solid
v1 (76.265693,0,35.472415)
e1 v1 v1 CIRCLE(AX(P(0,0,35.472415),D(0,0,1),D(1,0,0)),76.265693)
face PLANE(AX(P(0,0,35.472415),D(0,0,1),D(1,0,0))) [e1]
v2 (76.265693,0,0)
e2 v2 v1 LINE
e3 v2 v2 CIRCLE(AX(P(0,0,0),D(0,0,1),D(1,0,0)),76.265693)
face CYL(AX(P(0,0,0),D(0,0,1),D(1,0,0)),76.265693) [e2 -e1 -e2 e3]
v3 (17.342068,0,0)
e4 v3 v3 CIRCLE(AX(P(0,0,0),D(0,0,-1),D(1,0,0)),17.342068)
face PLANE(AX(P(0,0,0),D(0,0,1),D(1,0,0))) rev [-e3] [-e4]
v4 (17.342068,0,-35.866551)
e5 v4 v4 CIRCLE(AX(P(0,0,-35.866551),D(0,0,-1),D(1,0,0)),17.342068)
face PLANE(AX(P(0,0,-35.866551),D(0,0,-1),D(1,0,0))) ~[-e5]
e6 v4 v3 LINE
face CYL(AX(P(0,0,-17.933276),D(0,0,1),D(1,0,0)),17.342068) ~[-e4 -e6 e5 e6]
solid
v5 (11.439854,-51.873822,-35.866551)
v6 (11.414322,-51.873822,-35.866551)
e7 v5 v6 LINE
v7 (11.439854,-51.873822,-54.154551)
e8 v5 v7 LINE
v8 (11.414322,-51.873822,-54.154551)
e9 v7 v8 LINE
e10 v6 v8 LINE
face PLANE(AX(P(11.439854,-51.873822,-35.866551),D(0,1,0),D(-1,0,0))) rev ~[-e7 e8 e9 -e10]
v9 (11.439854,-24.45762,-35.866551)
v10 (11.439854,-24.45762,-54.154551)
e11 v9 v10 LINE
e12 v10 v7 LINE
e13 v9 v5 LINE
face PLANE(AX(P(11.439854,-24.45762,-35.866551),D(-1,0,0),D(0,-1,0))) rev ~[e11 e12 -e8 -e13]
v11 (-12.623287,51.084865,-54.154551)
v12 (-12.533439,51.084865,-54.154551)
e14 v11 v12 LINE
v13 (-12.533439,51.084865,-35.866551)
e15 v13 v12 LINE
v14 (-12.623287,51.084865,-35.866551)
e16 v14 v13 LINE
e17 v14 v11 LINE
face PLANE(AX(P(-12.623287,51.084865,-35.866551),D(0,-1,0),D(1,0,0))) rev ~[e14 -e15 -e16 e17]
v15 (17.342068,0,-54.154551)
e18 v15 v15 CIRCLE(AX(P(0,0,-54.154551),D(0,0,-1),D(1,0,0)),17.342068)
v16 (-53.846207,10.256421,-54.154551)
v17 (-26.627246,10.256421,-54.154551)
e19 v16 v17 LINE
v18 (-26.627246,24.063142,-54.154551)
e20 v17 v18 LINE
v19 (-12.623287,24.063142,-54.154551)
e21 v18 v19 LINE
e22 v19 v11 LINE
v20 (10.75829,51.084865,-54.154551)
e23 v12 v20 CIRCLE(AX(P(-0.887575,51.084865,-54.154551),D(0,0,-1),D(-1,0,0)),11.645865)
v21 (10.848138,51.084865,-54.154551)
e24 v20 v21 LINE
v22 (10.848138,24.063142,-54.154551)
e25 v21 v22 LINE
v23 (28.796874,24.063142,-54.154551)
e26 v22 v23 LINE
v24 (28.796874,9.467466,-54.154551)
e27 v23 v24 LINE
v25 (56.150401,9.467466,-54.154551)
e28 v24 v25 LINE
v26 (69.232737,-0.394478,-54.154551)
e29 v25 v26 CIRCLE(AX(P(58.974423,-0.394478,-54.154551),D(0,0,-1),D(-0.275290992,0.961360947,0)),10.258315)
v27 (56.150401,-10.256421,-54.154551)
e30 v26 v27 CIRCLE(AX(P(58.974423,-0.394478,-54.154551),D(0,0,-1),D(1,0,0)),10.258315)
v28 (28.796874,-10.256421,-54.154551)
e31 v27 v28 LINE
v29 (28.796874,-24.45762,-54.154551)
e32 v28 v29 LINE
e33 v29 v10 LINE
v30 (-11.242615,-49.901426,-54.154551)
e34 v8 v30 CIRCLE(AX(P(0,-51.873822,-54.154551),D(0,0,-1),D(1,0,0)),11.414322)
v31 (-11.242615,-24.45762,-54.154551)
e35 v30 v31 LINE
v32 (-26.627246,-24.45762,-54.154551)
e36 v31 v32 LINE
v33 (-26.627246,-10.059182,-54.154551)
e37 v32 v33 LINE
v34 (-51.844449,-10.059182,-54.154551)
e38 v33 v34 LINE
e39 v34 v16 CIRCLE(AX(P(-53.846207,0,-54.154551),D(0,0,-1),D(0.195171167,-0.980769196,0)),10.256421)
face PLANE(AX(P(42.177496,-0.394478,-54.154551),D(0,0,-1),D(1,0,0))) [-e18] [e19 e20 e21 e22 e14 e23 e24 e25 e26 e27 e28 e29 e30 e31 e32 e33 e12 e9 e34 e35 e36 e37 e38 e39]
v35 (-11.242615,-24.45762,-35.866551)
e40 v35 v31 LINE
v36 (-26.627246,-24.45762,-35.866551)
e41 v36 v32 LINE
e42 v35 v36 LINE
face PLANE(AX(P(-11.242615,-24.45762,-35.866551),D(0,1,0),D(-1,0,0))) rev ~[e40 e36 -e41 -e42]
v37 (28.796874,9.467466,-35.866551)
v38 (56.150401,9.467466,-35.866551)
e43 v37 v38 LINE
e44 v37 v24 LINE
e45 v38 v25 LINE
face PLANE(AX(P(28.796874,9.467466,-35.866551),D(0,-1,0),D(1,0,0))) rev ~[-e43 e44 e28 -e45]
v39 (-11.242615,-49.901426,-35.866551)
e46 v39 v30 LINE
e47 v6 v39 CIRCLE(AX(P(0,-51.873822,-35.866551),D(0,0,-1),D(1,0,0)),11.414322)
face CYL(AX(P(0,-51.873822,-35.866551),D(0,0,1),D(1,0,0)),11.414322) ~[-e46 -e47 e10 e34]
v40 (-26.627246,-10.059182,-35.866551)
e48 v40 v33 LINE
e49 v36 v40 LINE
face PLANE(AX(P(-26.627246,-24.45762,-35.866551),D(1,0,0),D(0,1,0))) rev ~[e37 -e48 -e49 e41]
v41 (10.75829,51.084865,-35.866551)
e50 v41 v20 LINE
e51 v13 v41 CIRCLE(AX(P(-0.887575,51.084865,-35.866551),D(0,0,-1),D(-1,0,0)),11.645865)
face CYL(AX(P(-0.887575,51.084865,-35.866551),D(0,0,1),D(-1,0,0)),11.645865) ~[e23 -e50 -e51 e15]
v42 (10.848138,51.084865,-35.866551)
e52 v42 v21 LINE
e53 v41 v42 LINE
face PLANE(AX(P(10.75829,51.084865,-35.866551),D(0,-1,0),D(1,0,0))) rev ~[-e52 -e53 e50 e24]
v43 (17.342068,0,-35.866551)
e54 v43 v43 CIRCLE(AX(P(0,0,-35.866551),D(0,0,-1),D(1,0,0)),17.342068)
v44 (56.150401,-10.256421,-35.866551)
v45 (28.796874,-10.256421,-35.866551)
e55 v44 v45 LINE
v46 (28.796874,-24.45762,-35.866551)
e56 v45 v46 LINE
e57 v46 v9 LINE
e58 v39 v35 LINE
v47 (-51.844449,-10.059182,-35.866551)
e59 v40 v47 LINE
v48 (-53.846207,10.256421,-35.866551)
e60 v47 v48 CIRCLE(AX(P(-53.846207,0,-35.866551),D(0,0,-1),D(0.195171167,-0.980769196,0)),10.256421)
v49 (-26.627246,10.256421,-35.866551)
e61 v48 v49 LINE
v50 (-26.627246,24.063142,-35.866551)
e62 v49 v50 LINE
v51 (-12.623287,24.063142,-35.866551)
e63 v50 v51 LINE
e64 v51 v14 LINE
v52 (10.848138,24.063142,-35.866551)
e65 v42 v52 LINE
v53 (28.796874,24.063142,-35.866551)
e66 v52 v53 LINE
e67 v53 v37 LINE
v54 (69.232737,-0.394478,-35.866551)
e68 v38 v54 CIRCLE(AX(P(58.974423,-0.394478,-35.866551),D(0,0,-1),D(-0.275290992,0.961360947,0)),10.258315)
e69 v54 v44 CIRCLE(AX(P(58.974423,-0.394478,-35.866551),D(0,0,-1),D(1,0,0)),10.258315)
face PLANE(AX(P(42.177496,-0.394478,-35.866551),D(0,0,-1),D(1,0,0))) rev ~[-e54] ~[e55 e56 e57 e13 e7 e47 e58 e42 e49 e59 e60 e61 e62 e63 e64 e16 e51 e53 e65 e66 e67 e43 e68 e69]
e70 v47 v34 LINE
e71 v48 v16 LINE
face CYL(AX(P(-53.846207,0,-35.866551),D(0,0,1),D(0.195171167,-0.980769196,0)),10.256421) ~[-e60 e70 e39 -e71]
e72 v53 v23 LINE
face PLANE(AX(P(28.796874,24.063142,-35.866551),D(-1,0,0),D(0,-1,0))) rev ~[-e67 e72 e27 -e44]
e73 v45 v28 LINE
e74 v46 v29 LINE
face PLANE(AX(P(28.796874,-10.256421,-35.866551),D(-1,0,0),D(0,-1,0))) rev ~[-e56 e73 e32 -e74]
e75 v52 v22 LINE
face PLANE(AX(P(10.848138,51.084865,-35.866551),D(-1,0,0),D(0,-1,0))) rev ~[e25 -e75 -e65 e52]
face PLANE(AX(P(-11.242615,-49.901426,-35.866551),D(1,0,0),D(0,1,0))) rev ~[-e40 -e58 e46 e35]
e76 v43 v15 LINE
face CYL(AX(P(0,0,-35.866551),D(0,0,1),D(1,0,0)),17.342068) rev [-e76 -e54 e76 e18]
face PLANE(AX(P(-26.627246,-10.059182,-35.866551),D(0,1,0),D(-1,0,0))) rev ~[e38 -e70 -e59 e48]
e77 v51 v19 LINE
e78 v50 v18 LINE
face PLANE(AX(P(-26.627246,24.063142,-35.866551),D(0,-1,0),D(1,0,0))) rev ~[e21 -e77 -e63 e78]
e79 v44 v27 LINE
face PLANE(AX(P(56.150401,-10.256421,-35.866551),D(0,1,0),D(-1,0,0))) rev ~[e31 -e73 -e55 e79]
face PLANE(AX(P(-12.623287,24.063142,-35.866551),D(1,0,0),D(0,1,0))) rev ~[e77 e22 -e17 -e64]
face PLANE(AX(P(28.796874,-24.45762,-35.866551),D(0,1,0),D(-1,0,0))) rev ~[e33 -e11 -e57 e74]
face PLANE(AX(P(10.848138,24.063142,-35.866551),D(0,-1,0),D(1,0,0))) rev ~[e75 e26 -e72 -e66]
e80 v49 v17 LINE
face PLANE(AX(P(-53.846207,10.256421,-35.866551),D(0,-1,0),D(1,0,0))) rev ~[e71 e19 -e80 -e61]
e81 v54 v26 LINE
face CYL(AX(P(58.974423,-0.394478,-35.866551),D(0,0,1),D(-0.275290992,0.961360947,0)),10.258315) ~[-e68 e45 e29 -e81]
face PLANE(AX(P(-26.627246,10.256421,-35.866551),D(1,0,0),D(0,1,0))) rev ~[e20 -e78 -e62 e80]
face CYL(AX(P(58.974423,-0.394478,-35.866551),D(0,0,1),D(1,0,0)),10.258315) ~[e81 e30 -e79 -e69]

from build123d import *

# Parameters (mm, degrees)
F2_W     = 17.3420682549
F2_H     = 35.8665511012
F4_R     = 17.3420682549
F5_DEPTH = 18.288


# Not quite as in the source:
# - the program builds the solid bodies; features that only make, move or delete a surface that nothing else refers to are left out


with BuildPart() as f1:
    # F0 (on Front) → F1 (revolve)
    with BuildSketch(Plane.XZ):
        with BuildLine():
            Line((0, 0), (35.2114337626, 0))
            ThreePointArc((35.2114337626, 0), (24.8982435888, 24.8982435888), (0, 35.2114337626))
            Line((0, 35.2114337626), (0, 0))
        make_face()
        with BuildLine():
            ThreePointArc((0, 35.2114337626), (24.8982435888, 24.8982435888), (35.2114337626, 0))
            Line((35.2114337626, 0), (76.2656927109, 0))
            Line((76.2656927109, 0), (76.2656927109, 35.4724153876))
            Line((76.2656927109, 35.4724153876), (0, 35.4724153876))
            Line((0, 35.4724153876), (0, 35.2114337626))
        make_face()
    revolve(axis=Axis((0, 0, 17.7362076938), (0, 0, 1)))

    # F2 (on Front) → F3 (revolve)
    with BuildSketch(Plane.XZ):
        with Locations((8.6710341275, -17.9332755506)):
            Rectangle(F2_W, F2_H)
    revolve(axis=Axis((0, 0, -17.9332755506), (0, 0, -1)))


with BuildPart() as f5:
    # F4 (on face) → F5 (new body)
    with BuildSketch(Plane(origin=(0, 0, -35.8665511012), x_dir=(1, 0, 0), z_dir=(0, 0, -1))):
        with BuildLine():
            Line((56.1504008339, 10.256420821), (28.7968739867, 10.256420821))
            Line((28.7968739867, 10.256420821), (28.7968739867, -9.467465803))
            Line((28.7968739867, -9.467465803), (56.1504008339, -9.467465803))
            ThreePointArc((56.1504008339, -9.467465803), (48.7161076265, 0.394477509), (56.1504008339, 10.256420821))
        make_face()
        Polygon((28.7968739867, 10.256420821), (28.7968739867, 24.4576204568), (11.4398542792, 24.4576204568), (-11.242615059, 24.4576204568), (-26.6272462904, 24.4576204568), (-26.6272462904, 10.0591816008), (-26.6272462904, -10.256420821), (-26.6272462904, -24.0631420165), (-12.623286806, -24.0631420165), (10.8481375501, -24.0631420165), (28.7968739867, -24.0631420165), (28.7968739867, -9.467465803), align=None)
        Circle(F4_R, mode=Mode.SUBTRACT)
        with BuildLine():
            Line((10.8481375501, -51.0848648846), (10.8481375501, -24.0631420165))
            Line((10.8481375501, -24.0631420165), (-12.623286806, -24.0631420165))
            Line((-12.623286806, -24.0631420165), (-12.623286806, -51.0848648846))
            Line((-12.623286806, -51.0848648846), (-12.5334393836, -51.0848648846))
            ThreePointArc((-12.5334393836, -51.0848648846), (-0.887574628, -39.4390001291), (10.7582901276, -51.0848648846))
            Line((10.7582901276, -51.0848648846), (10.8481375501, -51.0848648846))
        make_face()
        with BuildLine():
            Line((-26.6272462904, -10.256420821), (-26.6272462904, 10.0591816008))
            Line((-26.6272462904, 10.0591816008), (-51.8444488937, 10.0591816008))
            ThreePointArc((-51.8444488937, 10.0591816008), (-45.9176178455, 6.5062777185), (-43.5897856951, 0))
            ThreePointArc((-43.5897856951, 0), (-46.5938218028, -7.2523847132), (-53.846206516, -10.256420821))
            Line((-53.846206516, -10.256420821), (-26.6272462904, -10.256420821))
        make_face()
        with BuildLine():
            Line((-11.242615059, 24.4576204568), (11.4398542792, 24.4576204568))
            Line((11.4398542792, 24.4576204568), (11.4398542792, 51.8738217652))
            Line((11.4398542792, 51.8738217652), (11.4143216161, 51.8738217652))
            ThreePointArc((11.4143216161, 51.8738217652), (0.9899277412, 40.502507812), (-11.242615059, 49.9014261179))
            Line((-11.242615059, 49.9014261179), (-11.242615059, 24.4576204568))
        make_face()
        with BuildLine():
            ThreePointArc((69.2327374024, 0.394477509), (65.1495063475, 8.5860197322), (56.1504008339, 10.256420821))
            Line((56.1504008339, 10.256420821), (58.9744225144, 10.256420821))
            Line((58.9744225144, 10.256420821), (58.9744225144, -9.467465803))
            Line((58.9744225144, -9.467465803), (56.1504008339, -9.467465803))
            ThreePointArc((56.1504008339, -9.467465803), (65.1495063475, -7.7970647143), (69.2327374024, 0.394477509))
        make_face()
        with BuildLine():
            ThreePointArc((-12.5334393836, -51.0848648846), (-0.887574628, -62.7307296402), (10.7582901276, -51.0848648846))
            Line((10.7582901276, -51.0848648846), (-12.5334393836, -51.0848648846))
        make_face()
        with BuildLine():
            Line((-53.846206516, 10.0591816008), (-51.8444488937, 10.0591816008))
            ThreePointArc((-51.8444488937, 10.0591816008), (-64.0531984252, 1.0057257191), (-53.846206516, -10.256420821))
            Line((-53.846206516, -10.256420821), (-53.846206516, 10.0591816008))
        make_face()
        with BuildLine():
            Line((-12.5334393836, -51.0848648846), (10.7582901276, -51.0848648846))
            ThreePointArc((10.7582901276, -51.0848648846), (-0.887574628, -39.4390001291), (-12.5334393836, -51.0848648846))
        make_face()
        with BuildLine():
            Line((58.9744225144, 10.256420821), (56.1504008339, 10.256420821))
            ThreePointArc((56.1504008339, 10.256420821), (48.7161076265, 0.394477509), (56.1504008339, -9.467465803))
            Line((56.1504008339, -9.467465803), (58.9744225144, -9.467465803))
            Line((58.9744225144, -9.467465803), (58.9744225144, 10.256420821))
        make_face()
        with BuildLine():
            Line((-11.242615059, 51.8738217652), (-11.242615059, 49.9014261179))
            ThreePointArc((-11.242615059, 49.9014261179), (0.9899277412, 40.502507812), (11.4143216161, 51.8738217652))
            Line((11.4143216161, 51.8738217652), (-11.242615059, 51.8738217652))
        make_face()
        with BuildLine():
            ThreePointArc((11.4143216161, 51.8738217652), (-0.9899277412, 63.2451357184), (-11.242615059, 49.9014261179))
            Line((-11.242615059, 49.9014261179), (-11.242615059, 51.8738217652))
            Line((-11.242615059, 51.8738217652), (11.4143216161, 51.8738217652))
        make_face()
        with BuildLine():
            ThreePointArc((-43.5897856951, 0), (-45.9176178455, 6.5062777185), (-51.8444488937, 10.0591816008))
            Line((-51.8444488937, 10.0591816008), (-53.846206516, 10.0591816008))
            Line((-53.846206516, 10.0591816008), (-53.846206516, -10.256420821))
            ThreePointArc((-53.846206516, -10.256420821), (-46.5938218028, -7.2523847132), (-43.5897856951, 0))
        make_face()
    extrude(amount=F5_DEPTH)


solid = Compound([f1.part, f5.part])
